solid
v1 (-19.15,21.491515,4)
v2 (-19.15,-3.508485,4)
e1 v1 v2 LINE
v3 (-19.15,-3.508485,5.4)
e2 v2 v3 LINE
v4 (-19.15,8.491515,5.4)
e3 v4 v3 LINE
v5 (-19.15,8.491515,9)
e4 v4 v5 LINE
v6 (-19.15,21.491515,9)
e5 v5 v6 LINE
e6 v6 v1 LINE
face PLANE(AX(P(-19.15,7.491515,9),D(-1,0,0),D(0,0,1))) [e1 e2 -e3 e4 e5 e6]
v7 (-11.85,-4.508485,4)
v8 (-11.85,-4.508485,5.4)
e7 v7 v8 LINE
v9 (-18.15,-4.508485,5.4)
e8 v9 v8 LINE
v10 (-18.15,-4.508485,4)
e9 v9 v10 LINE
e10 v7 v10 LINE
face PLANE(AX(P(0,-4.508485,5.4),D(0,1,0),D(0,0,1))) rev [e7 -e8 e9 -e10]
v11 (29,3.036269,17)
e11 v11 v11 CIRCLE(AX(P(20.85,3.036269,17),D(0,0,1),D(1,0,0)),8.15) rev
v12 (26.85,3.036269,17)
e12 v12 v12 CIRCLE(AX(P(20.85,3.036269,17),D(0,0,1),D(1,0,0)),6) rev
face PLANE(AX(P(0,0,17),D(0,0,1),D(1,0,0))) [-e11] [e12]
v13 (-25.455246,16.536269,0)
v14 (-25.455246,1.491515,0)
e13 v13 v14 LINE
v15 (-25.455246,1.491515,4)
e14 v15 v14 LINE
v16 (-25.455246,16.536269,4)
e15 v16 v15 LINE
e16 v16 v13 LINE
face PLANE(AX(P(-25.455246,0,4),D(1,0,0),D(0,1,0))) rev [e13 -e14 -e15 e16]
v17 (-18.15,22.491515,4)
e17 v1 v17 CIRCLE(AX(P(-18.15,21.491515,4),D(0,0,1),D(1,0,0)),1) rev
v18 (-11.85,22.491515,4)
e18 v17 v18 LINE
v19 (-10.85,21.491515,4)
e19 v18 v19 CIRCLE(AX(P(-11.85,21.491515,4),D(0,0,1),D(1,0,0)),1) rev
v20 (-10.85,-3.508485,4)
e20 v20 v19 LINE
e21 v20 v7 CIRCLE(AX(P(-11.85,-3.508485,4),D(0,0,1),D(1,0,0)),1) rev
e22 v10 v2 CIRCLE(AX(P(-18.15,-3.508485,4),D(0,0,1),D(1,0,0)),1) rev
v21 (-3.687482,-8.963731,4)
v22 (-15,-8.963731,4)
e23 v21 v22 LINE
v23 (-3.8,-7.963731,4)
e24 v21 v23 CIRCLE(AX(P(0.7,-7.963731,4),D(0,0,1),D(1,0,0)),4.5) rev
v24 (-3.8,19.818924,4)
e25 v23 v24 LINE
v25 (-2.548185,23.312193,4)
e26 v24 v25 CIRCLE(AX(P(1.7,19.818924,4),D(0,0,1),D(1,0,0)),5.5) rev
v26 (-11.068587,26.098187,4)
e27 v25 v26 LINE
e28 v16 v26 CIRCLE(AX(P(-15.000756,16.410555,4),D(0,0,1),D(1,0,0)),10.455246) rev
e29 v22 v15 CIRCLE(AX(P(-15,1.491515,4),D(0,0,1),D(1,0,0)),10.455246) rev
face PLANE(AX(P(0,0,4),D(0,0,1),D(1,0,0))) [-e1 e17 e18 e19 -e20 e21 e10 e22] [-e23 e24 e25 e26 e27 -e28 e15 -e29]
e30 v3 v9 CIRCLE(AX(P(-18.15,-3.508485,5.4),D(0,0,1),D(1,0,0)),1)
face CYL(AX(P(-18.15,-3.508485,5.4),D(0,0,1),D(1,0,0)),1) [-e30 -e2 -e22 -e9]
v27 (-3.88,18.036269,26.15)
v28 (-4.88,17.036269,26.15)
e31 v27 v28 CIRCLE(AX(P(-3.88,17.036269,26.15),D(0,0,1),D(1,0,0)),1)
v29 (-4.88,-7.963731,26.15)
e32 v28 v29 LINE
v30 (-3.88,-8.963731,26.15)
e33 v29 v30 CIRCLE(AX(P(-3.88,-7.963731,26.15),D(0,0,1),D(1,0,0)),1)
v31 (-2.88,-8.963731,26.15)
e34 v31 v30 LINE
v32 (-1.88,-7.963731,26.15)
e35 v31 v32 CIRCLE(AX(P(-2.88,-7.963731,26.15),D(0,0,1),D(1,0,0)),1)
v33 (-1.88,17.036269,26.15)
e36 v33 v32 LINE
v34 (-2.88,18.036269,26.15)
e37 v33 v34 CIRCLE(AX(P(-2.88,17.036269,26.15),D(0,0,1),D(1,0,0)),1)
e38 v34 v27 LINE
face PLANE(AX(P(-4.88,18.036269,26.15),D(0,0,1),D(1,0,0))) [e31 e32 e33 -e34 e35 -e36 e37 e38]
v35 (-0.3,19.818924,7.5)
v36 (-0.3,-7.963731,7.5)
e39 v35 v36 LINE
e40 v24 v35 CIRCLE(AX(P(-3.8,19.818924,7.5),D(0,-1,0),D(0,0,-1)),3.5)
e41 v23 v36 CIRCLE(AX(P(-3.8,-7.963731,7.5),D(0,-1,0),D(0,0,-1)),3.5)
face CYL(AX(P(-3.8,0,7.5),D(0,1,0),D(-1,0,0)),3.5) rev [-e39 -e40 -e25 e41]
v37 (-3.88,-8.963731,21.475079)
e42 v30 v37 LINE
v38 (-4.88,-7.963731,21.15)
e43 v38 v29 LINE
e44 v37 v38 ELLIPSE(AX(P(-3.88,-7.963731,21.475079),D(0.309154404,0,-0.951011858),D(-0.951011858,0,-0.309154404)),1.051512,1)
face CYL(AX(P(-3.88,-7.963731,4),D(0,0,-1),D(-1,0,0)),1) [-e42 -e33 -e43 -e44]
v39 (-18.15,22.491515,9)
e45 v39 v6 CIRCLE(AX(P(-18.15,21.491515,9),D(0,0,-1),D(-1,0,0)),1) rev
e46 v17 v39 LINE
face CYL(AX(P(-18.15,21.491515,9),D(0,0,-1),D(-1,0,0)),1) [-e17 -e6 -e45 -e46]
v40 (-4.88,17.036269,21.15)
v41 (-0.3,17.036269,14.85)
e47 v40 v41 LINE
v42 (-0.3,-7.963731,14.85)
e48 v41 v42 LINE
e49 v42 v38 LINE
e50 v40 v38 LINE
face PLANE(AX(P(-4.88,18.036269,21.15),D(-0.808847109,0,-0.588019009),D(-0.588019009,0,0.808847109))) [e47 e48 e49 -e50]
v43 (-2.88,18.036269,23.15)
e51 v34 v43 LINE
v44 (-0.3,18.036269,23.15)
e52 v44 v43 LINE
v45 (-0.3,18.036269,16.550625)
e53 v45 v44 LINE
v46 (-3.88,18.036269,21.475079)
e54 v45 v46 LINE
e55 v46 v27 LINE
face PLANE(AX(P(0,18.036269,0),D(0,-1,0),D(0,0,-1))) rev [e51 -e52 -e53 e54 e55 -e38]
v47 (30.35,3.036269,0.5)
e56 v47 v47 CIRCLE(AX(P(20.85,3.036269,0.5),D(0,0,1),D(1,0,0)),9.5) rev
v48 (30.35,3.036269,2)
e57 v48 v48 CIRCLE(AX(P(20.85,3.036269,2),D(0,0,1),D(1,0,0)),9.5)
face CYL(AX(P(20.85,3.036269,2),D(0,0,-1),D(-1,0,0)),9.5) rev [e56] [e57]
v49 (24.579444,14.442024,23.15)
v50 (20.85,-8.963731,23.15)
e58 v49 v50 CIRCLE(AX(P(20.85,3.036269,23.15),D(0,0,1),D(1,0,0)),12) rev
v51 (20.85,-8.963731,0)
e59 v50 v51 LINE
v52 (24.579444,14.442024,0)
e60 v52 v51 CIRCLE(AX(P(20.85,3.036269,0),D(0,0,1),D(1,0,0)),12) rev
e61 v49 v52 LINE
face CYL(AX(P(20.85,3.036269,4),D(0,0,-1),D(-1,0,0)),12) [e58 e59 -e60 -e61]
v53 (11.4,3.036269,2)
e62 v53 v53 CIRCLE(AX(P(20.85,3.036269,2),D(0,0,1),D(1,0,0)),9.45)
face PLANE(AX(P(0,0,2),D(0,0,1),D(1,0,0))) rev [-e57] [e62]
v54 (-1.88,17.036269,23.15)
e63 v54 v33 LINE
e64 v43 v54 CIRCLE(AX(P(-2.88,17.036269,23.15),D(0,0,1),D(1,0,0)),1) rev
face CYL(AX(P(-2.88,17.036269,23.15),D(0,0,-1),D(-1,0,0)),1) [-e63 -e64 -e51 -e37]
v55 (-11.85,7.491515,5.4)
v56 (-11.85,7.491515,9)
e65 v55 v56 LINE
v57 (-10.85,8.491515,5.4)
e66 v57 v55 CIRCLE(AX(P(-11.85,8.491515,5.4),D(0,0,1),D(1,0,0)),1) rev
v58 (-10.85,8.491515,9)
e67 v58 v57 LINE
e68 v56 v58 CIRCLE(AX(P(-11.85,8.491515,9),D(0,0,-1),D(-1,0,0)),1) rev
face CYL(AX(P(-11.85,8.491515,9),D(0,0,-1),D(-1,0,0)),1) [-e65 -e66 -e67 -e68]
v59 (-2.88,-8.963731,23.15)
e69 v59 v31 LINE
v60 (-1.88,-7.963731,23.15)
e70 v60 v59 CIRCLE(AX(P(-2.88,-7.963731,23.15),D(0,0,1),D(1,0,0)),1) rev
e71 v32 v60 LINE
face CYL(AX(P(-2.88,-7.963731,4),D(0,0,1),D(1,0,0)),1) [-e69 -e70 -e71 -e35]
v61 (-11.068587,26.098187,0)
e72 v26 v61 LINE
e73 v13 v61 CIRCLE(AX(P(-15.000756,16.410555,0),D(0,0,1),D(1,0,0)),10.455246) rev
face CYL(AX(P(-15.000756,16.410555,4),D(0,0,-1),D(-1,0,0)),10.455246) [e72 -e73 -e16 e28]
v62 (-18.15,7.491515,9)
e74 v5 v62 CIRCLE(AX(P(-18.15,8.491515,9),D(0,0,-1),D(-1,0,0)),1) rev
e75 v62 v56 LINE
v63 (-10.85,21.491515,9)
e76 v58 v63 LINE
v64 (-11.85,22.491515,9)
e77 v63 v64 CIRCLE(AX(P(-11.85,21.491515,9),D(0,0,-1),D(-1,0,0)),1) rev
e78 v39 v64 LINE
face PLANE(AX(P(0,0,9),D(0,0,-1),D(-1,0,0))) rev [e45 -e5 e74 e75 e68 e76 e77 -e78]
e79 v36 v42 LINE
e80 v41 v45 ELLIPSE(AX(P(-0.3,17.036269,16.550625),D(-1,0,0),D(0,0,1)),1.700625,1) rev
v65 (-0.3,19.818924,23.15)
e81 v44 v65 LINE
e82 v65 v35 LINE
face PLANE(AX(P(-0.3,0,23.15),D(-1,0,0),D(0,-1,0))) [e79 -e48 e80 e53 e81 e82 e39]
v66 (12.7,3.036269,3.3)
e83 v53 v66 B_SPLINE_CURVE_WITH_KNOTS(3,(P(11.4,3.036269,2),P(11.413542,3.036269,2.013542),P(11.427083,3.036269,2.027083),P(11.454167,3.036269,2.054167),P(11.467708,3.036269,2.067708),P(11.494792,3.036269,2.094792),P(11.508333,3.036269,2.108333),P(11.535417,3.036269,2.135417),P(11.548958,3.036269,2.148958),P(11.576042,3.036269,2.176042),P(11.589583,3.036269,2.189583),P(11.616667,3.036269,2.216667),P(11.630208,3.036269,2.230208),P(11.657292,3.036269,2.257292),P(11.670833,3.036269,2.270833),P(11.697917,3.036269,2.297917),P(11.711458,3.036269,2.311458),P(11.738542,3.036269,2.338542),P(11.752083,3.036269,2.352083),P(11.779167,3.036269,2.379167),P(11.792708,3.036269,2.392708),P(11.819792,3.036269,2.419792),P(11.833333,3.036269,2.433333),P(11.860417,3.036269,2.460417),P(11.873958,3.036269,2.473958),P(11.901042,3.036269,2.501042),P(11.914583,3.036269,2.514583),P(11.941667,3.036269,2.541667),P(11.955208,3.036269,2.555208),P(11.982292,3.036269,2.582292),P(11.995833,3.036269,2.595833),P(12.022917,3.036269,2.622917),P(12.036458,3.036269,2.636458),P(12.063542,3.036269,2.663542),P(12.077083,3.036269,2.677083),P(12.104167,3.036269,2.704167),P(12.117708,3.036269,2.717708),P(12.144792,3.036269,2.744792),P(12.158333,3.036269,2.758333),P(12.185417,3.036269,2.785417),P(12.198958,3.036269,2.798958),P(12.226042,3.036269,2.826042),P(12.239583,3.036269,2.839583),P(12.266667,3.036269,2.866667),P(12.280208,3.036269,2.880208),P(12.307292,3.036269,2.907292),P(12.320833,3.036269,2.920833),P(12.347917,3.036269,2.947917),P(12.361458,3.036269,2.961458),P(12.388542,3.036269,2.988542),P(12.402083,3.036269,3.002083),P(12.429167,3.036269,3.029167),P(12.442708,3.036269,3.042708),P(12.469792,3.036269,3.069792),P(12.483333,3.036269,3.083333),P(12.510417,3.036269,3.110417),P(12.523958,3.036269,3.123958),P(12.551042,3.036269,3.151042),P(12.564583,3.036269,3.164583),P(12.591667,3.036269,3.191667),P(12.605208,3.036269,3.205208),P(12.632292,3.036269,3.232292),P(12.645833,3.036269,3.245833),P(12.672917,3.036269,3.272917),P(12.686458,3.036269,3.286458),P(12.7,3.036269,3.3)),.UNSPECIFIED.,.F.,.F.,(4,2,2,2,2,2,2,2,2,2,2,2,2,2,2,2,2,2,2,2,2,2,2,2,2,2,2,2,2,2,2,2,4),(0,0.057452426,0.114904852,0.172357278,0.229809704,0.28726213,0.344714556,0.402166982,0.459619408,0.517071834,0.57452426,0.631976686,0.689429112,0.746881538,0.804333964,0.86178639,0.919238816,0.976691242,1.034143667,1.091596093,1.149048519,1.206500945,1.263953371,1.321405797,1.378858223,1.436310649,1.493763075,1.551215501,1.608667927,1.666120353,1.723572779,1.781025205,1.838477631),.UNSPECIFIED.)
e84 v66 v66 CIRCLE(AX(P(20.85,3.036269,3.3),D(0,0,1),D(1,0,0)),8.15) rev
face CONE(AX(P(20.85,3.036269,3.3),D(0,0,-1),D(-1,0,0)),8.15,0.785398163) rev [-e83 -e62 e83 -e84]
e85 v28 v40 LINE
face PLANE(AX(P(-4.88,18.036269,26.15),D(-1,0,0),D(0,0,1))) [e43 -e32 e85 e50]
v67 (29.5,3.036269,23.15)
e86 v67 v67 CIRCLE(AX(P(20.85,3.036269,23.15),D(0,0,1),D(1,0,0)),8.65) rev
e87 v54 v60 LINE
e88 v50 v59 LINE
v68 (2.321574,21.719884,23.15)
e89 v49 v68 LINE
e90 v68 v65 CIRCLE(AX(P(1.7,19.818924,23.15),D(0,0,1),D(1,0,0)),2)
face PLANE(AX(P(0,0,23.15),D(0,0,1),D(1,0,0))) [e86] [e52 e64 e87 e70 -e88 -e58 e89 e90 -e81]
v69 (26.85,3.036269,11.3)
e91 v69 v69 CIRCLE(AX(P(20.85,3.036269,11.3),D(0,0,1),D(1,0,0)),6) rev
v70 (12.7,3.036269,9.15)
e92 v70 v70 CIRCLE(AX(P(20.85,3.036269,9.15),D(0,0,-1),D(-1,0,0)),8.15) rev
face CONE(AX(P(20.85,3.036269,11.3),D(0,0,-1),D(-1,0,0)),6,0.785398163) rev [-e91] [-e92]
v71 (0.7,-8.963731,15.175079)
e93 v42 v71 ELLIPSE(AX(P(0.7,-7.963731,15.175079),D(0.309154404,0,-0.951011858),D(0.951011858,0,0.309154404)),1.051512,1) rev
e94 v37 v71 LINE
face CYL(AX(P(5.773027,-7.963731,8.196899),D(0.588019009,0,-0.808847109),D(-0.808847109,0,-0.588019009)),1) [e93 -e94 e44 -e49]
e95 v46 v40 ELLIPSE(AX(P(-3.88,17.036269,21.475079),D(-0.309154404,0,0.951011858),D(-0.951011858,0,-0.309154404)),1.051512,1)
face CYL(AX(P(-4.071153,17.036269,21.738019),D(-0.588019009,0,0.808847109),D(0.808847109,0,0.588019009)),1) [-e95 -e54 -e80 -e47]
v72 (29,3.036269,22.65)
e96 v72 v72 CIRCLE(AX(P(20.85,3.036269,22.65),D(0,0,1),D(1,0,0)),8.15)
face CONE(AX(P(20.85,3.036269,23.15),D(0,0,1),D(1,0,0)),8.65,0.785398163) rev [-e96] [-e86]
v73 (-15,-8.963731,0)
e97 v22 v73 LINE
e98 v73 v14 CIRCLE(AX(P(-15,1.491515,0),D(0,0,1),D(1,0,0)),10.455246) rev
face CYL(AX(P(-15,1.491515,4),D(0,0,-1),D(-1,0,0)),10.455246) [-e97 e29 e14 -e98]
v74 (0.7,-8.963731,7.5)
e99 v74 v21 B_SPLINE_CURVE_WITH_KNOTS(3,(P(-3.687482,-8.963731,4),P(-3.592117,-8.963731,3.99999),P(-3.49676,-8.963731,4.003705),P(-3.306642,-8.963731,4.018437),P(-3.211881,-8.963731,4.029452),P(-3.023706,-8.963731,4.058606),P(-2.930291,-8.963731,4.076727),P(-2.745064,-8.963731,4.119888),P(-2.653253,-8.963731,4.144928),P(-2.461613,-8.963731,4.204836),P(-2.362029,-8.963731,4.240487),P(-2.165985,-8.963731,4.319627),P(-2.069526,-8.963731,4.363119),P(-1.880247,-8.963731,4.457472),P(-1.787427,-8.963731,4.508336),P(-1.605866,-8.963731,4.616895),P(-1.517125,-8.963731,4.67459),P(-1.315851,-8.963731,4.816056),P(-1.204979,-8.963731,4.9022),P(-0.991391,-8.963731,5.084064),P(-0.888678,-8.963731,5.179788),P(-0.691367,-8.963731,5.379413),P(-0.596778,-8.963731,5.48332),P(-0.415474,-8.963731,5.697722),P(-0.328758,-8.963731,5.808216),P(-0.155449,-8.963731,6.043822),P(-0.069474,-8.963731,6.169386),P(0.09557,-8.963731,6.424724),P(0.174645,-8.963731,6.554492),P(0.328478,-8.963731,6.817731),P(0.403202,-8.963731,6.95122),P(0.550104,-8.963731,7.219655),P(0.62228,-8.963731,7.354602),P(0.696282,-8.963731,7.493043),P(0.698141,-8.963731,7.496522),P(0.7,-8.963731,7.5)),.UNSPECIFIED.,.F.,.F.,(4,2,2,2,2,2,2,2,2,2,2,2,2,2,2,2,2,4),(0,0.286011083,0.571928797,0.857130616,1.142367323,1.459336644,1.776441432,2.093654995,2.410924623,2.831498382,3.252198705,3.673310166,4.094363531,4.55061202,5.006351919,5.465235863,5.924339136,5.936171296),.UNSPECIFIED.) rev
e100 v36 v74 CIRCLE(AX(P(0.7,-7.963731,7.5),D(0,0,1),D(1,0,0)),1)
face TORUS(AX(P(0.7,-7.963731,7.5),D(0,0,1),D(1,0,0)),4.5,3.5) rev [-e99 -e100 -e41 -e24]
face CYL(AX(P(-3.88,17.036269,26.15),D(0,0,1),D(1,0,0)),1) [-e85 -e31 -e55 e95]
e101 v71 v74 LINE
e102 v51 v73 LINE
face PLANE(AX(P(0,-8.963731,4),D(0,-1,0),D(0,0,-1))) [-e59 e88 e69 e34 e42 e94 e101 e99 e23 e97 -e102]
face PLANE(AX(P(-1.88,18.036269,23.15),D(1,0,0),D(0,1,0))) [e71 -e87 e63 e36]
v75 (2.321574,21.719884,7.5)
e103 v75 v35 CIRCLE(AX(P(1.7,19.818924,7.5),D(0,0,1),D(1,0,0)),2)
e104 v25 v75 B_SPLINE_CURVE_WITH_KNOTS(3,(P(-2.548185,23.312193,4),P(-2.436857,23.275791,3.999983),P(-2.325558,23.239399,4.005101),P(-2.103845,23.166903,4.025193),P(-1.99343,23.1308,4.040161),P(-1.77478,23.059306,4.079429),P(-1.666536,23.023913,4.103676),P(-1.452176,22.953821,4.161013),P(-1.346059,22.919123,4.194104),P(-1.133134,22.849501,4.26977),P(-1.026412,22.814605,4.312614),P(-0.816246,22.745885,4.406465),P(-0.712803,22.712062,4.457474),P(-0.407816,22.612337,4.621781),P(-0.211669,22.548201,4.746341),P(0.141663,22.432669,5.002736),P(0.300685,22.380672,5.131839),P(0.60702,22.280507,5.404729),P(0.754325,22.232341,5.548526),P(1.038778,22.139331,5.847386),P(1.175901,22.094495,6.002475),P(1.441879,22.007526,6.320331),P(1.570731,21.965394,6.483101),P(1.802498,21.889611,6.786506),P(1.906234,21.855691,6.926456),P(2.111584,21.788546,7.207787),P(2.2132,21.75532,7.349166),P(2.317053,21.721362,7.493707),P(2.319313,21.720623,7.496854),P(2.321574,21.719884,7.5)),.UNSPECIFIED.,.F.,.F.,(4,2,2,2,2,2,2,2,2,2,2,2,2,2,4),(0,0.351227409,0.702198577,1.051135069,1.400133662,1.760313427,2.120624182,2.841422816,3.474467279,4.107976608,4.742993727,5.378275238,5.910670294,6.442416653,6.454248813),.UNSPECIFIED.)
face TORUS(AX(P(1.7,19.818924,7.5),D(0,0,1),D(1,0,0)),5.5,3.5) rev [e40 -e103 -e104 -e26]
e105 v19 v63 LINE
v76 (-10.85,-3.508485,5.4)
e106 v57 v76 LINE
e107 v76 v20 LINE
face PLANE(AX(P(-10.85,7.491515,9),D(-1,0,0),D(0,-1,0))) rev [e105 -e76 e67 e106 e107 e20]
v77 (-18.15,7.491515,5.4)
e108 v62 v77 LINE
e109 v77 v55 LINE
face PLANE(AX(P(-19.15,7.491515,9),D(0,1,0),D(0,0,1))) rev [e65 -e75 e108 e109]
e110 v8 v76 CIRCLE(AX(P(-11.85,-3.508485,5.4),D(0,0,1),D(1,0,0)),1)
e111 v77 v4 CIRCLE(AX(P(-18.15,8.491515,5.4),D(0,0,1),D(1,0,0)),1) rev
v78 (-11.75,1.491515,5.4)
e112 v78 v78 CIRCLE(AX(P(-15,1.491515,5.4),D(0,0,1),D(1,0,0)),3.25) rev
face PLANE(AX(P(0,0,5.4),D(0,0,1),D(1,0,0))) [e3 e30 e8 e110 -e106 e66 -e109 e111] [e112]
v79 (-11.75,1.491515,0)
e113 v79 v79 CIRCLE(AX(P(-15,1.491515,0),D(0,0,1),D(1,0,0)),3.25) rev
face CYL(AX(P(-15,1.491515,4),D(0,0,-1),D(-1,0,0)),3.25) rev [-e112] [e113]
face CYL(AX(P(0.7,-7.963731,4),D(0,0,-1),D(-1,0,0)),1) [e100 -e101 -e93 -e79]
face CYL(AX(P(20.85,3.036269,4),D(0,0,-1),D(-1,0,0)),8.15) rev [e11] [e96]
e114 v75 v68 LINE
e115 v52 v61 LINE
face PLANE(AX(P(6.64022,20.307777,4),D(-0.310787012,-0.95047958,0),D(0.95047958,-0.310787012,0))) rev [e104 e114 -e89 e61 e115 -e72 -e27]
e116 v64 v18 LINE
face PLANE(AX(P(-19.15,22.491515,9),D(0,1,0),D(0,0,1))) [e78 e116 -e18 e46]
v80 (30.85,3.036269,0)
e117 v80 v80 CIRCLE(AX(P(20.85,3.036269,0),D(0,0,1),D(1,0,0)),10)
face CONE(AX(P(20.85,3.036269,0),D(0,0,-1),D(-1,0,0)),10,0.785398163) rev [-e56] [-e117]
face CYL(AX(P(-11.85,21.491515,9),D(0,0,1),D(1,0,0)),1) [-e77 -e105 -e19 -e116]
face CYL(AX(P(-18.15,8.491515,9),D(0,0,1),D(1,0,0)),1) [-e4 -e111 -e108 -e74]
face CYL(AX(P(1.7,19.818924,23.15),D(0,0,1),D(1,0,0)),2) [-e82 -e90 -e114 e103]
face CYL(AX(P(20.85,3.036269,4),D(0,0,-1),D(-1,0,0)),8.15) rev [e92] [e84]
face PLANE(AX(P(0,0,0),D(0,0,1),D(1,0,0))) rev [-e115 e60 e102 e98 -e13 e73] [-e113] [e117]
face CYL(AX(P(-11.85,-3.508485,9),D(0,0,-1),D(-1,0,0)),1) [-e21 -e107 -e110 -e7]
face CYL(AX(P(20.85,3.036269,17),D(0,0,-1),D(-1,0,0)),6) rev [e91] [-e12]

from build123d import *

# Parameters (mm, degrees)
SKETCH_1_R          = 3.2500000000000004
SKETCH_1_R_2        = 8.149999999999999
EXTRUDE_1_DEPTH     = 4
SKETCH_1_3_R        = 11.999999999999993
SKETCH_1_3_R_2      = 8.149999999999999
SKETCH_1_3_R_3      = 9.500000000000002
EXTRUDE_2_DEPTH     = 23.15
EXTRUDE_START       = 9
SKETCH_1_4_R        = 8.149999999999999
SKETCH_1_4_R_2      = 5.999999999999998
EXTRUDE_3_DEPTH     = 8
EXTRUDE_4_DEPTH     = 9.000000000000002
FILLET_1_R          = 2
EXTRUDE_5_DEPTH     = 27
FILLET_2_R          = 1
SKETCH_1_6_R        = 9.500000000000002
SKETCH_1_6_R_2      = 8.149999999999999
CUT_EXTRUDE_1_DEPTH = 2
CHAMFER_1_SIZE      = 2.3
CHAMFER_2_SIZE      = 1.3
FILLET_4_R          = 3.5
SKETCH_1_7_R        = 3.2500000000000004
EXTRUDE_6_DEPTH     = 5.4
FILLET_3_R          = 1
CHAMFER_3_SIZE      = 0.5


with BuildPart() as part:
    # Эскиз1 → Бобышка-Вытянуть1 (new body)
    with BuildSketch(Plane.XY):
        with BuildLine():
            Line((-14.999999999999972, -8.963730931198981), (20.850000000000577, -8.96373093119897))
            ThreePointArc((20.85000000000058, -8.963730931198967), (32.70050757538239, 1.1480237971749345), (24.57944414926456, 14.44202403449797))
            Line((24.57944414926456, 14.44202403449797), (-11.068586896529624, 26.098187192163547))
            ThreePointArc((-11.068586896529625, 26.098187192163547), (-20.788047002520305, 25.117990405859814), (-25.455246310980815, 16.536269068801015))
            Line((-25.455246310980815, 16.536269068801015), (-25.45524631098081, 1.4915153797818874))
            ThreePointArc((-25.45524631098081, 1.4915153797818874), (-22.392975565470174, -5.9014601856883235), (-14.999999999999972, -8.96373093119898))
        make_face()
        Polygon((-10.849999999999971, 7.491515379781886), (-19.149999999999974, 7.491515379781886), (-19.149999999999974, 22.491515379781884), (-10.849999999999973, 22.491515379781884), align=None, mode=Mode.SUBTRACT)
        with Locations((-14.999999999999972, 1.4915153797818852)):
            Circle(SKETCH_1_R, mode=Mode.SUBTRACT)
        with Locations((20.85000000000058, 3.036269068801026)):
            Circle(SKETCH_1_R_2, mode=Mode.SUBTRACT)
    extrude(amount=EXTRUDE_1_DEPTH)

    # Эскиз1<3> → Бобышка-Вытянуть2 (add)
    # profile 1 of 3: a face of its own
    with BuildSketch(Plane.XY):
        with BuildLine():
            Line((-0.29999999999996874, -8.96373093119897), (20.85000000000058, -8.96373093119897))
            ThreePointArc((20.850000000000577, -8.963730931198967), (8.999492424618776, 4.924514340427118), (24.57944414926456, 14.44202403449797))
            Line((24.57944414926456, 14.442024034497972), (-0.2999999999999723, 22.57708372133782))
            Line((-0.2999999999999722, 22.57708372133782), (-0.2999999999999704, -8.96373093119897))
        make_face()
    # profile 2 of 3: a face of its own
    with BuildSketch(Plane.XY):
        with Locations((20.85000000000058, 3.036269068801026)):
            Circle(SKETCH_1_3_R)
        with Locations((20.85000000000058, 3.036269068801026)):
            Circle(SKETCH_1_3_R_2, mode=Mode.SUBTRACT)
    # profile 3 of 3: a face of its own
    with BuildSketch(Plane.XY):
        with Locations((20.85000000000058, 3.036269068801026)):
            Circle(SKETCH_1_3_R_3)
        with Locations((20.85000000000058, 3.036269068801026)):
            Circle(SKETCH_1_3_R_2, mode=Mode.SUBTRACT)
    extrude(amount=EXTRUDE_2_DEPTH)

    # Эскиз1<4> → Бобышка-Вытянуть3 (add)
    with BuildSketch(Plane.XY.offset(EXTRUDE_START)):
        with Locations((20.85000000000058, 3.036269068801026)):
            Circle(SKETCH_1_4_R)
        with Locations((20.85000000000058, 3.036269068801026)):
            Circle(SKETCH_1_4_R_2, mode=Mode.SUBTRACT)
    extrude(amount=EXTRUDE_3_DEPTH)

    # Эскиз1<5> → Бобышка-Вытянуть4 (add)
    with BuildSketch(Plane.XY):
        Polygon((-10.849999999999971, 7.491515379781886), (-10.849999999999973, 22.491515379781884), (-19.149999999999974, 22.491515379781884), (-19.149999999999974, 7.491515379781886), align=None)
    extrude(amount=EXTRUDE_4_DEPTH)

    # Скругление1
    fillet_1_edges = [part.edges().sort_by_distance(p)[0] for p in [
        (-0.29999999999997223, 22.57708372133782, 13.575),
    ]]
    fillet(fillet_1_edges, radius=FILLET_1_R)

    # Эскиз4 → Бобышка-Вытянуть5 (add)
    with BuildSketch(Plane.XZ.offset(8.96373093119897)):
        Polygon((-4.879999999999971, 26.15), (-4.87999999999997, 21.15), (-0.2999999999999704, 14.85), (-0.2999999999999704, 23.150000000000002), (-1.8799999999999704, 23.150000000000002), (-1.8799999999999704, 26.15), align=None)
    extrude(amount=-EXTRUDE_5_DEPTH)

    # Скругление2
    fillet_2_edges = [part.edges().sort_by_distance(p)[0] for p in [
        (-0.29999999999996957, -8.96373093119897, 9.425),
        (-2.589999999999968, 18.03626906880103, 18),
        (-4.879999999999969, 18.03626906880103, 23.65),
        (-1.8799999999999681, 18.03626906880103, 24.65),
        (-2.58999999999997, -8.96373093119897, 18),
        (-1.8799999999999704, -8.96373093119897, 24.65),
        (-4.879999999999971, -8.96373093119897, 23.65),
    ]]
    fillet(fillet_2_edges, radius=FILLET_2_R)

    # Эскиз1<6> → Вырез-Вытянуть1 (cut)
    with BuildSketch(Plane.XY):
        with Locations((20.85000000000058, 3.036269068801026)):
            Circle(SKETCH_1_6_R)
        with Locations((20.85000000000058, 3.036269068801026)):
            Circle(SKETCH_1_6_R_2, mode=Mode.SUBTRACT)
    extrude(amount=CUT_EXTRUDE_1_DEPTH, mode=Mode.SUBTRACT)

    # Фаска1
    # the kernel refuses this chamfer: 2.3 mm, written as the material it takes off along each edge
    with BuildSketch(Plane(origin=(20.85000000000058, 3.036269068801026, 9), x_dir=(1, 0, 0), z_dir=(0, -1, 0))) as chamfer_1_piece_1_section:
        Polygon((5.9999999999999964, CHAMFER_1_SIZE), (5.9999999999999964 + CHAMFER_1_SIZE, 0), (5.9999999999999964, 0), align=None)
    chamfer_1_piece_1 = revolve(axis=Axis((20.85000000000058, 3.036269068801026, 9), (0, 0, 1)), mode=Mode.PRIVATE)
    chamfer_1_piece_1 = chamfer_1_piece_1 & Plane(origin=(20.85000000000058, 3.036269068801026, 10.222457747954977), x_dir=(1, 0, 0), z_dir=(0, 0, -1)) * Cylinder(8.149999999999999, 34, mode=Mode.PRIVATE)
    add(chamfer_1_piece_1, mode=Mode.SUBTRACT)

    # Фаска2
    chamfer_2_edges = [part.edges().sort_by_distance(p)[0] for p in [
        (12.700000000000582, 3.036269068801027, 2),
    ]]
    chamfer(chamfer_2_edges, length=CHAMFER_2_SIZE)

    # Скругление4
    # the kernel refuses this fillet: 3.5 mm, written as the material it adds along each edge
    with BuildSketch(Plane(origin=(0.7000000000000293, -7.963730931198976, 4), x_dir=(-0.9999802608561372, 0.006283143965558403, 0), z_dir=(-0.006283143965558403, -0.9999802608561372, 0))) as fillet_4_piece_1_section:
        with BuildLine():
            CenterArc((-0.9999999999999992 - FILLET_4_R, -FILLET_4_R), FILLET_4_R, 0, 90)
            Line((-0.9999999999999979, -FILLET_4_R), (-0.9999999999999992, 0))
            Line((-0.9999999999999992, 0), (-0.9999999999999992 - FILLET_4_R, 0))
        make_face()
    fillet_4_piece_1 = revolve(axis=Axis((0.7000000000000293, -7.963730931198976, 4), (0, 0, -1)), revolution_arc=359.64000000000004, mode=Mode.PRIVATE)
    fillet_4_piece_1 = split(fillet_4_piece_1, bisect_by=Plane(origin=(-0.06522476751896455, -8.963730931198977, 5.353005928395178), z_dir=(-3e-16, 1, 0)), keep=Keep.TOP, mode=Mode.PRIVATE)
    add(fillet_4_piece_1)
    with BuildSketch(Plane(origin=(-0.2999999999999705, -7.963730931198976, 4), x_dir=(-1, -6e-17, 0), z_dir=(-6e-17, 1, 0))) as fillet_4_piece_2:
        with BuildLine():
            CenterArc((FILLET_4_R, FILLET_4_R), FILLET_4_R, 180, 90)
            Line((-4.4e-16, FILLET_4_R), (0, 0))
            Line((0, 0), (FILLET_4_R, 0))
        make_face()
    extrude(amount=27.782655425625357)
    with BuildSketch(Plane(origin=(1.7000000000000277, 19.818924494426383, 4), x_dir=(-0.9998226837850567, -0.018830852047809543, 0), z_dir=(-0.018830852047809543, 0.9998226837850567, 0))) as fillet_4_piece_3_section:
        with BuildLine():
            CenterArc((-2.000000000000004 - FILLET_4_R, FILLET_4_R), FILLET_4_R, 270, 90)
            Line((-2.000000000000004, FILLET_4_R), (-2.000000000000004, 0))
            Line((-2.000000000000004, 0), (-2.000000000000004 - FILLET_4_R, 0))
        make_face()
    fillet_4_piece_3 = revolve(axis=Axis((1.7000000000000277, 19.818924494426383, 4), (0, 0, 1)), revolution_arc=358.921007878005, mode=Mode.PRIVATE)
    fillet_4_piece_3 = split(fillet_4_piece_3, bisect_by=Plane(origin=(0.6026329252520348, 22.28194156791278, 5.095559189965934), z_dir=(-0.3107870124386654, -0.950479580474746, 0)), keep=Keep.TOP, mode=Mode.PRIVATE)
    add(fillet_4_piece_3)

    # Эскиз1<7> → Бобышка-Вытянуть6 (add)
    with BuildSketch(Plane.XY):
        Polygon((-10.849999999999971, 7.491515379781886), (-19.149999999999974, 7.491515379781886), (-19.149999999999974, -4.508484620218114), (-10.849999999999971, -4.508484620218115), align=None)
        with Locations((-14.999999999999972, 1.4915153797818852)):
            Circle(SKETCH_1_7_R, mode=Mode.SUBTRACT)
    extrude(amount=EXTRUDE_6_DEPTH)

    # Скругление3
    fillet_3_edges = [part.edges().sort_by_distance(p)[0] for p in [
        (-19.149999999999974, -4.508484620218114, 4.7),
        (-10.849999999999971, -4.508484620218114, 4.7),
        (-19.149999999999974, 22.491515379781884, 6.500000000000001),
        (-19.149999999999974, 7.491515379781886, 7.200000000000001),
        (-10.849999999999971, 7.491515379781886, 7.200000000000001),
        (-10.849999999999973, 22.491515379781884, 6.500000000000001),
    ]]
    fillet(fillet_3_edges, radius=FILLET_3_R)

    # Фаска3
    chamfer_3_edges = [part.edges().sort_by_distance(p)[0] for p in [
        (11.350000000000579, 3.0362690688010274, 0),
        (12.700000000000582, 3.036269068801027, 23.15),
    ]]
    chamfer(chamfer_3_edges, length=CHAMFER_3_SIZE)


solid = part.part
